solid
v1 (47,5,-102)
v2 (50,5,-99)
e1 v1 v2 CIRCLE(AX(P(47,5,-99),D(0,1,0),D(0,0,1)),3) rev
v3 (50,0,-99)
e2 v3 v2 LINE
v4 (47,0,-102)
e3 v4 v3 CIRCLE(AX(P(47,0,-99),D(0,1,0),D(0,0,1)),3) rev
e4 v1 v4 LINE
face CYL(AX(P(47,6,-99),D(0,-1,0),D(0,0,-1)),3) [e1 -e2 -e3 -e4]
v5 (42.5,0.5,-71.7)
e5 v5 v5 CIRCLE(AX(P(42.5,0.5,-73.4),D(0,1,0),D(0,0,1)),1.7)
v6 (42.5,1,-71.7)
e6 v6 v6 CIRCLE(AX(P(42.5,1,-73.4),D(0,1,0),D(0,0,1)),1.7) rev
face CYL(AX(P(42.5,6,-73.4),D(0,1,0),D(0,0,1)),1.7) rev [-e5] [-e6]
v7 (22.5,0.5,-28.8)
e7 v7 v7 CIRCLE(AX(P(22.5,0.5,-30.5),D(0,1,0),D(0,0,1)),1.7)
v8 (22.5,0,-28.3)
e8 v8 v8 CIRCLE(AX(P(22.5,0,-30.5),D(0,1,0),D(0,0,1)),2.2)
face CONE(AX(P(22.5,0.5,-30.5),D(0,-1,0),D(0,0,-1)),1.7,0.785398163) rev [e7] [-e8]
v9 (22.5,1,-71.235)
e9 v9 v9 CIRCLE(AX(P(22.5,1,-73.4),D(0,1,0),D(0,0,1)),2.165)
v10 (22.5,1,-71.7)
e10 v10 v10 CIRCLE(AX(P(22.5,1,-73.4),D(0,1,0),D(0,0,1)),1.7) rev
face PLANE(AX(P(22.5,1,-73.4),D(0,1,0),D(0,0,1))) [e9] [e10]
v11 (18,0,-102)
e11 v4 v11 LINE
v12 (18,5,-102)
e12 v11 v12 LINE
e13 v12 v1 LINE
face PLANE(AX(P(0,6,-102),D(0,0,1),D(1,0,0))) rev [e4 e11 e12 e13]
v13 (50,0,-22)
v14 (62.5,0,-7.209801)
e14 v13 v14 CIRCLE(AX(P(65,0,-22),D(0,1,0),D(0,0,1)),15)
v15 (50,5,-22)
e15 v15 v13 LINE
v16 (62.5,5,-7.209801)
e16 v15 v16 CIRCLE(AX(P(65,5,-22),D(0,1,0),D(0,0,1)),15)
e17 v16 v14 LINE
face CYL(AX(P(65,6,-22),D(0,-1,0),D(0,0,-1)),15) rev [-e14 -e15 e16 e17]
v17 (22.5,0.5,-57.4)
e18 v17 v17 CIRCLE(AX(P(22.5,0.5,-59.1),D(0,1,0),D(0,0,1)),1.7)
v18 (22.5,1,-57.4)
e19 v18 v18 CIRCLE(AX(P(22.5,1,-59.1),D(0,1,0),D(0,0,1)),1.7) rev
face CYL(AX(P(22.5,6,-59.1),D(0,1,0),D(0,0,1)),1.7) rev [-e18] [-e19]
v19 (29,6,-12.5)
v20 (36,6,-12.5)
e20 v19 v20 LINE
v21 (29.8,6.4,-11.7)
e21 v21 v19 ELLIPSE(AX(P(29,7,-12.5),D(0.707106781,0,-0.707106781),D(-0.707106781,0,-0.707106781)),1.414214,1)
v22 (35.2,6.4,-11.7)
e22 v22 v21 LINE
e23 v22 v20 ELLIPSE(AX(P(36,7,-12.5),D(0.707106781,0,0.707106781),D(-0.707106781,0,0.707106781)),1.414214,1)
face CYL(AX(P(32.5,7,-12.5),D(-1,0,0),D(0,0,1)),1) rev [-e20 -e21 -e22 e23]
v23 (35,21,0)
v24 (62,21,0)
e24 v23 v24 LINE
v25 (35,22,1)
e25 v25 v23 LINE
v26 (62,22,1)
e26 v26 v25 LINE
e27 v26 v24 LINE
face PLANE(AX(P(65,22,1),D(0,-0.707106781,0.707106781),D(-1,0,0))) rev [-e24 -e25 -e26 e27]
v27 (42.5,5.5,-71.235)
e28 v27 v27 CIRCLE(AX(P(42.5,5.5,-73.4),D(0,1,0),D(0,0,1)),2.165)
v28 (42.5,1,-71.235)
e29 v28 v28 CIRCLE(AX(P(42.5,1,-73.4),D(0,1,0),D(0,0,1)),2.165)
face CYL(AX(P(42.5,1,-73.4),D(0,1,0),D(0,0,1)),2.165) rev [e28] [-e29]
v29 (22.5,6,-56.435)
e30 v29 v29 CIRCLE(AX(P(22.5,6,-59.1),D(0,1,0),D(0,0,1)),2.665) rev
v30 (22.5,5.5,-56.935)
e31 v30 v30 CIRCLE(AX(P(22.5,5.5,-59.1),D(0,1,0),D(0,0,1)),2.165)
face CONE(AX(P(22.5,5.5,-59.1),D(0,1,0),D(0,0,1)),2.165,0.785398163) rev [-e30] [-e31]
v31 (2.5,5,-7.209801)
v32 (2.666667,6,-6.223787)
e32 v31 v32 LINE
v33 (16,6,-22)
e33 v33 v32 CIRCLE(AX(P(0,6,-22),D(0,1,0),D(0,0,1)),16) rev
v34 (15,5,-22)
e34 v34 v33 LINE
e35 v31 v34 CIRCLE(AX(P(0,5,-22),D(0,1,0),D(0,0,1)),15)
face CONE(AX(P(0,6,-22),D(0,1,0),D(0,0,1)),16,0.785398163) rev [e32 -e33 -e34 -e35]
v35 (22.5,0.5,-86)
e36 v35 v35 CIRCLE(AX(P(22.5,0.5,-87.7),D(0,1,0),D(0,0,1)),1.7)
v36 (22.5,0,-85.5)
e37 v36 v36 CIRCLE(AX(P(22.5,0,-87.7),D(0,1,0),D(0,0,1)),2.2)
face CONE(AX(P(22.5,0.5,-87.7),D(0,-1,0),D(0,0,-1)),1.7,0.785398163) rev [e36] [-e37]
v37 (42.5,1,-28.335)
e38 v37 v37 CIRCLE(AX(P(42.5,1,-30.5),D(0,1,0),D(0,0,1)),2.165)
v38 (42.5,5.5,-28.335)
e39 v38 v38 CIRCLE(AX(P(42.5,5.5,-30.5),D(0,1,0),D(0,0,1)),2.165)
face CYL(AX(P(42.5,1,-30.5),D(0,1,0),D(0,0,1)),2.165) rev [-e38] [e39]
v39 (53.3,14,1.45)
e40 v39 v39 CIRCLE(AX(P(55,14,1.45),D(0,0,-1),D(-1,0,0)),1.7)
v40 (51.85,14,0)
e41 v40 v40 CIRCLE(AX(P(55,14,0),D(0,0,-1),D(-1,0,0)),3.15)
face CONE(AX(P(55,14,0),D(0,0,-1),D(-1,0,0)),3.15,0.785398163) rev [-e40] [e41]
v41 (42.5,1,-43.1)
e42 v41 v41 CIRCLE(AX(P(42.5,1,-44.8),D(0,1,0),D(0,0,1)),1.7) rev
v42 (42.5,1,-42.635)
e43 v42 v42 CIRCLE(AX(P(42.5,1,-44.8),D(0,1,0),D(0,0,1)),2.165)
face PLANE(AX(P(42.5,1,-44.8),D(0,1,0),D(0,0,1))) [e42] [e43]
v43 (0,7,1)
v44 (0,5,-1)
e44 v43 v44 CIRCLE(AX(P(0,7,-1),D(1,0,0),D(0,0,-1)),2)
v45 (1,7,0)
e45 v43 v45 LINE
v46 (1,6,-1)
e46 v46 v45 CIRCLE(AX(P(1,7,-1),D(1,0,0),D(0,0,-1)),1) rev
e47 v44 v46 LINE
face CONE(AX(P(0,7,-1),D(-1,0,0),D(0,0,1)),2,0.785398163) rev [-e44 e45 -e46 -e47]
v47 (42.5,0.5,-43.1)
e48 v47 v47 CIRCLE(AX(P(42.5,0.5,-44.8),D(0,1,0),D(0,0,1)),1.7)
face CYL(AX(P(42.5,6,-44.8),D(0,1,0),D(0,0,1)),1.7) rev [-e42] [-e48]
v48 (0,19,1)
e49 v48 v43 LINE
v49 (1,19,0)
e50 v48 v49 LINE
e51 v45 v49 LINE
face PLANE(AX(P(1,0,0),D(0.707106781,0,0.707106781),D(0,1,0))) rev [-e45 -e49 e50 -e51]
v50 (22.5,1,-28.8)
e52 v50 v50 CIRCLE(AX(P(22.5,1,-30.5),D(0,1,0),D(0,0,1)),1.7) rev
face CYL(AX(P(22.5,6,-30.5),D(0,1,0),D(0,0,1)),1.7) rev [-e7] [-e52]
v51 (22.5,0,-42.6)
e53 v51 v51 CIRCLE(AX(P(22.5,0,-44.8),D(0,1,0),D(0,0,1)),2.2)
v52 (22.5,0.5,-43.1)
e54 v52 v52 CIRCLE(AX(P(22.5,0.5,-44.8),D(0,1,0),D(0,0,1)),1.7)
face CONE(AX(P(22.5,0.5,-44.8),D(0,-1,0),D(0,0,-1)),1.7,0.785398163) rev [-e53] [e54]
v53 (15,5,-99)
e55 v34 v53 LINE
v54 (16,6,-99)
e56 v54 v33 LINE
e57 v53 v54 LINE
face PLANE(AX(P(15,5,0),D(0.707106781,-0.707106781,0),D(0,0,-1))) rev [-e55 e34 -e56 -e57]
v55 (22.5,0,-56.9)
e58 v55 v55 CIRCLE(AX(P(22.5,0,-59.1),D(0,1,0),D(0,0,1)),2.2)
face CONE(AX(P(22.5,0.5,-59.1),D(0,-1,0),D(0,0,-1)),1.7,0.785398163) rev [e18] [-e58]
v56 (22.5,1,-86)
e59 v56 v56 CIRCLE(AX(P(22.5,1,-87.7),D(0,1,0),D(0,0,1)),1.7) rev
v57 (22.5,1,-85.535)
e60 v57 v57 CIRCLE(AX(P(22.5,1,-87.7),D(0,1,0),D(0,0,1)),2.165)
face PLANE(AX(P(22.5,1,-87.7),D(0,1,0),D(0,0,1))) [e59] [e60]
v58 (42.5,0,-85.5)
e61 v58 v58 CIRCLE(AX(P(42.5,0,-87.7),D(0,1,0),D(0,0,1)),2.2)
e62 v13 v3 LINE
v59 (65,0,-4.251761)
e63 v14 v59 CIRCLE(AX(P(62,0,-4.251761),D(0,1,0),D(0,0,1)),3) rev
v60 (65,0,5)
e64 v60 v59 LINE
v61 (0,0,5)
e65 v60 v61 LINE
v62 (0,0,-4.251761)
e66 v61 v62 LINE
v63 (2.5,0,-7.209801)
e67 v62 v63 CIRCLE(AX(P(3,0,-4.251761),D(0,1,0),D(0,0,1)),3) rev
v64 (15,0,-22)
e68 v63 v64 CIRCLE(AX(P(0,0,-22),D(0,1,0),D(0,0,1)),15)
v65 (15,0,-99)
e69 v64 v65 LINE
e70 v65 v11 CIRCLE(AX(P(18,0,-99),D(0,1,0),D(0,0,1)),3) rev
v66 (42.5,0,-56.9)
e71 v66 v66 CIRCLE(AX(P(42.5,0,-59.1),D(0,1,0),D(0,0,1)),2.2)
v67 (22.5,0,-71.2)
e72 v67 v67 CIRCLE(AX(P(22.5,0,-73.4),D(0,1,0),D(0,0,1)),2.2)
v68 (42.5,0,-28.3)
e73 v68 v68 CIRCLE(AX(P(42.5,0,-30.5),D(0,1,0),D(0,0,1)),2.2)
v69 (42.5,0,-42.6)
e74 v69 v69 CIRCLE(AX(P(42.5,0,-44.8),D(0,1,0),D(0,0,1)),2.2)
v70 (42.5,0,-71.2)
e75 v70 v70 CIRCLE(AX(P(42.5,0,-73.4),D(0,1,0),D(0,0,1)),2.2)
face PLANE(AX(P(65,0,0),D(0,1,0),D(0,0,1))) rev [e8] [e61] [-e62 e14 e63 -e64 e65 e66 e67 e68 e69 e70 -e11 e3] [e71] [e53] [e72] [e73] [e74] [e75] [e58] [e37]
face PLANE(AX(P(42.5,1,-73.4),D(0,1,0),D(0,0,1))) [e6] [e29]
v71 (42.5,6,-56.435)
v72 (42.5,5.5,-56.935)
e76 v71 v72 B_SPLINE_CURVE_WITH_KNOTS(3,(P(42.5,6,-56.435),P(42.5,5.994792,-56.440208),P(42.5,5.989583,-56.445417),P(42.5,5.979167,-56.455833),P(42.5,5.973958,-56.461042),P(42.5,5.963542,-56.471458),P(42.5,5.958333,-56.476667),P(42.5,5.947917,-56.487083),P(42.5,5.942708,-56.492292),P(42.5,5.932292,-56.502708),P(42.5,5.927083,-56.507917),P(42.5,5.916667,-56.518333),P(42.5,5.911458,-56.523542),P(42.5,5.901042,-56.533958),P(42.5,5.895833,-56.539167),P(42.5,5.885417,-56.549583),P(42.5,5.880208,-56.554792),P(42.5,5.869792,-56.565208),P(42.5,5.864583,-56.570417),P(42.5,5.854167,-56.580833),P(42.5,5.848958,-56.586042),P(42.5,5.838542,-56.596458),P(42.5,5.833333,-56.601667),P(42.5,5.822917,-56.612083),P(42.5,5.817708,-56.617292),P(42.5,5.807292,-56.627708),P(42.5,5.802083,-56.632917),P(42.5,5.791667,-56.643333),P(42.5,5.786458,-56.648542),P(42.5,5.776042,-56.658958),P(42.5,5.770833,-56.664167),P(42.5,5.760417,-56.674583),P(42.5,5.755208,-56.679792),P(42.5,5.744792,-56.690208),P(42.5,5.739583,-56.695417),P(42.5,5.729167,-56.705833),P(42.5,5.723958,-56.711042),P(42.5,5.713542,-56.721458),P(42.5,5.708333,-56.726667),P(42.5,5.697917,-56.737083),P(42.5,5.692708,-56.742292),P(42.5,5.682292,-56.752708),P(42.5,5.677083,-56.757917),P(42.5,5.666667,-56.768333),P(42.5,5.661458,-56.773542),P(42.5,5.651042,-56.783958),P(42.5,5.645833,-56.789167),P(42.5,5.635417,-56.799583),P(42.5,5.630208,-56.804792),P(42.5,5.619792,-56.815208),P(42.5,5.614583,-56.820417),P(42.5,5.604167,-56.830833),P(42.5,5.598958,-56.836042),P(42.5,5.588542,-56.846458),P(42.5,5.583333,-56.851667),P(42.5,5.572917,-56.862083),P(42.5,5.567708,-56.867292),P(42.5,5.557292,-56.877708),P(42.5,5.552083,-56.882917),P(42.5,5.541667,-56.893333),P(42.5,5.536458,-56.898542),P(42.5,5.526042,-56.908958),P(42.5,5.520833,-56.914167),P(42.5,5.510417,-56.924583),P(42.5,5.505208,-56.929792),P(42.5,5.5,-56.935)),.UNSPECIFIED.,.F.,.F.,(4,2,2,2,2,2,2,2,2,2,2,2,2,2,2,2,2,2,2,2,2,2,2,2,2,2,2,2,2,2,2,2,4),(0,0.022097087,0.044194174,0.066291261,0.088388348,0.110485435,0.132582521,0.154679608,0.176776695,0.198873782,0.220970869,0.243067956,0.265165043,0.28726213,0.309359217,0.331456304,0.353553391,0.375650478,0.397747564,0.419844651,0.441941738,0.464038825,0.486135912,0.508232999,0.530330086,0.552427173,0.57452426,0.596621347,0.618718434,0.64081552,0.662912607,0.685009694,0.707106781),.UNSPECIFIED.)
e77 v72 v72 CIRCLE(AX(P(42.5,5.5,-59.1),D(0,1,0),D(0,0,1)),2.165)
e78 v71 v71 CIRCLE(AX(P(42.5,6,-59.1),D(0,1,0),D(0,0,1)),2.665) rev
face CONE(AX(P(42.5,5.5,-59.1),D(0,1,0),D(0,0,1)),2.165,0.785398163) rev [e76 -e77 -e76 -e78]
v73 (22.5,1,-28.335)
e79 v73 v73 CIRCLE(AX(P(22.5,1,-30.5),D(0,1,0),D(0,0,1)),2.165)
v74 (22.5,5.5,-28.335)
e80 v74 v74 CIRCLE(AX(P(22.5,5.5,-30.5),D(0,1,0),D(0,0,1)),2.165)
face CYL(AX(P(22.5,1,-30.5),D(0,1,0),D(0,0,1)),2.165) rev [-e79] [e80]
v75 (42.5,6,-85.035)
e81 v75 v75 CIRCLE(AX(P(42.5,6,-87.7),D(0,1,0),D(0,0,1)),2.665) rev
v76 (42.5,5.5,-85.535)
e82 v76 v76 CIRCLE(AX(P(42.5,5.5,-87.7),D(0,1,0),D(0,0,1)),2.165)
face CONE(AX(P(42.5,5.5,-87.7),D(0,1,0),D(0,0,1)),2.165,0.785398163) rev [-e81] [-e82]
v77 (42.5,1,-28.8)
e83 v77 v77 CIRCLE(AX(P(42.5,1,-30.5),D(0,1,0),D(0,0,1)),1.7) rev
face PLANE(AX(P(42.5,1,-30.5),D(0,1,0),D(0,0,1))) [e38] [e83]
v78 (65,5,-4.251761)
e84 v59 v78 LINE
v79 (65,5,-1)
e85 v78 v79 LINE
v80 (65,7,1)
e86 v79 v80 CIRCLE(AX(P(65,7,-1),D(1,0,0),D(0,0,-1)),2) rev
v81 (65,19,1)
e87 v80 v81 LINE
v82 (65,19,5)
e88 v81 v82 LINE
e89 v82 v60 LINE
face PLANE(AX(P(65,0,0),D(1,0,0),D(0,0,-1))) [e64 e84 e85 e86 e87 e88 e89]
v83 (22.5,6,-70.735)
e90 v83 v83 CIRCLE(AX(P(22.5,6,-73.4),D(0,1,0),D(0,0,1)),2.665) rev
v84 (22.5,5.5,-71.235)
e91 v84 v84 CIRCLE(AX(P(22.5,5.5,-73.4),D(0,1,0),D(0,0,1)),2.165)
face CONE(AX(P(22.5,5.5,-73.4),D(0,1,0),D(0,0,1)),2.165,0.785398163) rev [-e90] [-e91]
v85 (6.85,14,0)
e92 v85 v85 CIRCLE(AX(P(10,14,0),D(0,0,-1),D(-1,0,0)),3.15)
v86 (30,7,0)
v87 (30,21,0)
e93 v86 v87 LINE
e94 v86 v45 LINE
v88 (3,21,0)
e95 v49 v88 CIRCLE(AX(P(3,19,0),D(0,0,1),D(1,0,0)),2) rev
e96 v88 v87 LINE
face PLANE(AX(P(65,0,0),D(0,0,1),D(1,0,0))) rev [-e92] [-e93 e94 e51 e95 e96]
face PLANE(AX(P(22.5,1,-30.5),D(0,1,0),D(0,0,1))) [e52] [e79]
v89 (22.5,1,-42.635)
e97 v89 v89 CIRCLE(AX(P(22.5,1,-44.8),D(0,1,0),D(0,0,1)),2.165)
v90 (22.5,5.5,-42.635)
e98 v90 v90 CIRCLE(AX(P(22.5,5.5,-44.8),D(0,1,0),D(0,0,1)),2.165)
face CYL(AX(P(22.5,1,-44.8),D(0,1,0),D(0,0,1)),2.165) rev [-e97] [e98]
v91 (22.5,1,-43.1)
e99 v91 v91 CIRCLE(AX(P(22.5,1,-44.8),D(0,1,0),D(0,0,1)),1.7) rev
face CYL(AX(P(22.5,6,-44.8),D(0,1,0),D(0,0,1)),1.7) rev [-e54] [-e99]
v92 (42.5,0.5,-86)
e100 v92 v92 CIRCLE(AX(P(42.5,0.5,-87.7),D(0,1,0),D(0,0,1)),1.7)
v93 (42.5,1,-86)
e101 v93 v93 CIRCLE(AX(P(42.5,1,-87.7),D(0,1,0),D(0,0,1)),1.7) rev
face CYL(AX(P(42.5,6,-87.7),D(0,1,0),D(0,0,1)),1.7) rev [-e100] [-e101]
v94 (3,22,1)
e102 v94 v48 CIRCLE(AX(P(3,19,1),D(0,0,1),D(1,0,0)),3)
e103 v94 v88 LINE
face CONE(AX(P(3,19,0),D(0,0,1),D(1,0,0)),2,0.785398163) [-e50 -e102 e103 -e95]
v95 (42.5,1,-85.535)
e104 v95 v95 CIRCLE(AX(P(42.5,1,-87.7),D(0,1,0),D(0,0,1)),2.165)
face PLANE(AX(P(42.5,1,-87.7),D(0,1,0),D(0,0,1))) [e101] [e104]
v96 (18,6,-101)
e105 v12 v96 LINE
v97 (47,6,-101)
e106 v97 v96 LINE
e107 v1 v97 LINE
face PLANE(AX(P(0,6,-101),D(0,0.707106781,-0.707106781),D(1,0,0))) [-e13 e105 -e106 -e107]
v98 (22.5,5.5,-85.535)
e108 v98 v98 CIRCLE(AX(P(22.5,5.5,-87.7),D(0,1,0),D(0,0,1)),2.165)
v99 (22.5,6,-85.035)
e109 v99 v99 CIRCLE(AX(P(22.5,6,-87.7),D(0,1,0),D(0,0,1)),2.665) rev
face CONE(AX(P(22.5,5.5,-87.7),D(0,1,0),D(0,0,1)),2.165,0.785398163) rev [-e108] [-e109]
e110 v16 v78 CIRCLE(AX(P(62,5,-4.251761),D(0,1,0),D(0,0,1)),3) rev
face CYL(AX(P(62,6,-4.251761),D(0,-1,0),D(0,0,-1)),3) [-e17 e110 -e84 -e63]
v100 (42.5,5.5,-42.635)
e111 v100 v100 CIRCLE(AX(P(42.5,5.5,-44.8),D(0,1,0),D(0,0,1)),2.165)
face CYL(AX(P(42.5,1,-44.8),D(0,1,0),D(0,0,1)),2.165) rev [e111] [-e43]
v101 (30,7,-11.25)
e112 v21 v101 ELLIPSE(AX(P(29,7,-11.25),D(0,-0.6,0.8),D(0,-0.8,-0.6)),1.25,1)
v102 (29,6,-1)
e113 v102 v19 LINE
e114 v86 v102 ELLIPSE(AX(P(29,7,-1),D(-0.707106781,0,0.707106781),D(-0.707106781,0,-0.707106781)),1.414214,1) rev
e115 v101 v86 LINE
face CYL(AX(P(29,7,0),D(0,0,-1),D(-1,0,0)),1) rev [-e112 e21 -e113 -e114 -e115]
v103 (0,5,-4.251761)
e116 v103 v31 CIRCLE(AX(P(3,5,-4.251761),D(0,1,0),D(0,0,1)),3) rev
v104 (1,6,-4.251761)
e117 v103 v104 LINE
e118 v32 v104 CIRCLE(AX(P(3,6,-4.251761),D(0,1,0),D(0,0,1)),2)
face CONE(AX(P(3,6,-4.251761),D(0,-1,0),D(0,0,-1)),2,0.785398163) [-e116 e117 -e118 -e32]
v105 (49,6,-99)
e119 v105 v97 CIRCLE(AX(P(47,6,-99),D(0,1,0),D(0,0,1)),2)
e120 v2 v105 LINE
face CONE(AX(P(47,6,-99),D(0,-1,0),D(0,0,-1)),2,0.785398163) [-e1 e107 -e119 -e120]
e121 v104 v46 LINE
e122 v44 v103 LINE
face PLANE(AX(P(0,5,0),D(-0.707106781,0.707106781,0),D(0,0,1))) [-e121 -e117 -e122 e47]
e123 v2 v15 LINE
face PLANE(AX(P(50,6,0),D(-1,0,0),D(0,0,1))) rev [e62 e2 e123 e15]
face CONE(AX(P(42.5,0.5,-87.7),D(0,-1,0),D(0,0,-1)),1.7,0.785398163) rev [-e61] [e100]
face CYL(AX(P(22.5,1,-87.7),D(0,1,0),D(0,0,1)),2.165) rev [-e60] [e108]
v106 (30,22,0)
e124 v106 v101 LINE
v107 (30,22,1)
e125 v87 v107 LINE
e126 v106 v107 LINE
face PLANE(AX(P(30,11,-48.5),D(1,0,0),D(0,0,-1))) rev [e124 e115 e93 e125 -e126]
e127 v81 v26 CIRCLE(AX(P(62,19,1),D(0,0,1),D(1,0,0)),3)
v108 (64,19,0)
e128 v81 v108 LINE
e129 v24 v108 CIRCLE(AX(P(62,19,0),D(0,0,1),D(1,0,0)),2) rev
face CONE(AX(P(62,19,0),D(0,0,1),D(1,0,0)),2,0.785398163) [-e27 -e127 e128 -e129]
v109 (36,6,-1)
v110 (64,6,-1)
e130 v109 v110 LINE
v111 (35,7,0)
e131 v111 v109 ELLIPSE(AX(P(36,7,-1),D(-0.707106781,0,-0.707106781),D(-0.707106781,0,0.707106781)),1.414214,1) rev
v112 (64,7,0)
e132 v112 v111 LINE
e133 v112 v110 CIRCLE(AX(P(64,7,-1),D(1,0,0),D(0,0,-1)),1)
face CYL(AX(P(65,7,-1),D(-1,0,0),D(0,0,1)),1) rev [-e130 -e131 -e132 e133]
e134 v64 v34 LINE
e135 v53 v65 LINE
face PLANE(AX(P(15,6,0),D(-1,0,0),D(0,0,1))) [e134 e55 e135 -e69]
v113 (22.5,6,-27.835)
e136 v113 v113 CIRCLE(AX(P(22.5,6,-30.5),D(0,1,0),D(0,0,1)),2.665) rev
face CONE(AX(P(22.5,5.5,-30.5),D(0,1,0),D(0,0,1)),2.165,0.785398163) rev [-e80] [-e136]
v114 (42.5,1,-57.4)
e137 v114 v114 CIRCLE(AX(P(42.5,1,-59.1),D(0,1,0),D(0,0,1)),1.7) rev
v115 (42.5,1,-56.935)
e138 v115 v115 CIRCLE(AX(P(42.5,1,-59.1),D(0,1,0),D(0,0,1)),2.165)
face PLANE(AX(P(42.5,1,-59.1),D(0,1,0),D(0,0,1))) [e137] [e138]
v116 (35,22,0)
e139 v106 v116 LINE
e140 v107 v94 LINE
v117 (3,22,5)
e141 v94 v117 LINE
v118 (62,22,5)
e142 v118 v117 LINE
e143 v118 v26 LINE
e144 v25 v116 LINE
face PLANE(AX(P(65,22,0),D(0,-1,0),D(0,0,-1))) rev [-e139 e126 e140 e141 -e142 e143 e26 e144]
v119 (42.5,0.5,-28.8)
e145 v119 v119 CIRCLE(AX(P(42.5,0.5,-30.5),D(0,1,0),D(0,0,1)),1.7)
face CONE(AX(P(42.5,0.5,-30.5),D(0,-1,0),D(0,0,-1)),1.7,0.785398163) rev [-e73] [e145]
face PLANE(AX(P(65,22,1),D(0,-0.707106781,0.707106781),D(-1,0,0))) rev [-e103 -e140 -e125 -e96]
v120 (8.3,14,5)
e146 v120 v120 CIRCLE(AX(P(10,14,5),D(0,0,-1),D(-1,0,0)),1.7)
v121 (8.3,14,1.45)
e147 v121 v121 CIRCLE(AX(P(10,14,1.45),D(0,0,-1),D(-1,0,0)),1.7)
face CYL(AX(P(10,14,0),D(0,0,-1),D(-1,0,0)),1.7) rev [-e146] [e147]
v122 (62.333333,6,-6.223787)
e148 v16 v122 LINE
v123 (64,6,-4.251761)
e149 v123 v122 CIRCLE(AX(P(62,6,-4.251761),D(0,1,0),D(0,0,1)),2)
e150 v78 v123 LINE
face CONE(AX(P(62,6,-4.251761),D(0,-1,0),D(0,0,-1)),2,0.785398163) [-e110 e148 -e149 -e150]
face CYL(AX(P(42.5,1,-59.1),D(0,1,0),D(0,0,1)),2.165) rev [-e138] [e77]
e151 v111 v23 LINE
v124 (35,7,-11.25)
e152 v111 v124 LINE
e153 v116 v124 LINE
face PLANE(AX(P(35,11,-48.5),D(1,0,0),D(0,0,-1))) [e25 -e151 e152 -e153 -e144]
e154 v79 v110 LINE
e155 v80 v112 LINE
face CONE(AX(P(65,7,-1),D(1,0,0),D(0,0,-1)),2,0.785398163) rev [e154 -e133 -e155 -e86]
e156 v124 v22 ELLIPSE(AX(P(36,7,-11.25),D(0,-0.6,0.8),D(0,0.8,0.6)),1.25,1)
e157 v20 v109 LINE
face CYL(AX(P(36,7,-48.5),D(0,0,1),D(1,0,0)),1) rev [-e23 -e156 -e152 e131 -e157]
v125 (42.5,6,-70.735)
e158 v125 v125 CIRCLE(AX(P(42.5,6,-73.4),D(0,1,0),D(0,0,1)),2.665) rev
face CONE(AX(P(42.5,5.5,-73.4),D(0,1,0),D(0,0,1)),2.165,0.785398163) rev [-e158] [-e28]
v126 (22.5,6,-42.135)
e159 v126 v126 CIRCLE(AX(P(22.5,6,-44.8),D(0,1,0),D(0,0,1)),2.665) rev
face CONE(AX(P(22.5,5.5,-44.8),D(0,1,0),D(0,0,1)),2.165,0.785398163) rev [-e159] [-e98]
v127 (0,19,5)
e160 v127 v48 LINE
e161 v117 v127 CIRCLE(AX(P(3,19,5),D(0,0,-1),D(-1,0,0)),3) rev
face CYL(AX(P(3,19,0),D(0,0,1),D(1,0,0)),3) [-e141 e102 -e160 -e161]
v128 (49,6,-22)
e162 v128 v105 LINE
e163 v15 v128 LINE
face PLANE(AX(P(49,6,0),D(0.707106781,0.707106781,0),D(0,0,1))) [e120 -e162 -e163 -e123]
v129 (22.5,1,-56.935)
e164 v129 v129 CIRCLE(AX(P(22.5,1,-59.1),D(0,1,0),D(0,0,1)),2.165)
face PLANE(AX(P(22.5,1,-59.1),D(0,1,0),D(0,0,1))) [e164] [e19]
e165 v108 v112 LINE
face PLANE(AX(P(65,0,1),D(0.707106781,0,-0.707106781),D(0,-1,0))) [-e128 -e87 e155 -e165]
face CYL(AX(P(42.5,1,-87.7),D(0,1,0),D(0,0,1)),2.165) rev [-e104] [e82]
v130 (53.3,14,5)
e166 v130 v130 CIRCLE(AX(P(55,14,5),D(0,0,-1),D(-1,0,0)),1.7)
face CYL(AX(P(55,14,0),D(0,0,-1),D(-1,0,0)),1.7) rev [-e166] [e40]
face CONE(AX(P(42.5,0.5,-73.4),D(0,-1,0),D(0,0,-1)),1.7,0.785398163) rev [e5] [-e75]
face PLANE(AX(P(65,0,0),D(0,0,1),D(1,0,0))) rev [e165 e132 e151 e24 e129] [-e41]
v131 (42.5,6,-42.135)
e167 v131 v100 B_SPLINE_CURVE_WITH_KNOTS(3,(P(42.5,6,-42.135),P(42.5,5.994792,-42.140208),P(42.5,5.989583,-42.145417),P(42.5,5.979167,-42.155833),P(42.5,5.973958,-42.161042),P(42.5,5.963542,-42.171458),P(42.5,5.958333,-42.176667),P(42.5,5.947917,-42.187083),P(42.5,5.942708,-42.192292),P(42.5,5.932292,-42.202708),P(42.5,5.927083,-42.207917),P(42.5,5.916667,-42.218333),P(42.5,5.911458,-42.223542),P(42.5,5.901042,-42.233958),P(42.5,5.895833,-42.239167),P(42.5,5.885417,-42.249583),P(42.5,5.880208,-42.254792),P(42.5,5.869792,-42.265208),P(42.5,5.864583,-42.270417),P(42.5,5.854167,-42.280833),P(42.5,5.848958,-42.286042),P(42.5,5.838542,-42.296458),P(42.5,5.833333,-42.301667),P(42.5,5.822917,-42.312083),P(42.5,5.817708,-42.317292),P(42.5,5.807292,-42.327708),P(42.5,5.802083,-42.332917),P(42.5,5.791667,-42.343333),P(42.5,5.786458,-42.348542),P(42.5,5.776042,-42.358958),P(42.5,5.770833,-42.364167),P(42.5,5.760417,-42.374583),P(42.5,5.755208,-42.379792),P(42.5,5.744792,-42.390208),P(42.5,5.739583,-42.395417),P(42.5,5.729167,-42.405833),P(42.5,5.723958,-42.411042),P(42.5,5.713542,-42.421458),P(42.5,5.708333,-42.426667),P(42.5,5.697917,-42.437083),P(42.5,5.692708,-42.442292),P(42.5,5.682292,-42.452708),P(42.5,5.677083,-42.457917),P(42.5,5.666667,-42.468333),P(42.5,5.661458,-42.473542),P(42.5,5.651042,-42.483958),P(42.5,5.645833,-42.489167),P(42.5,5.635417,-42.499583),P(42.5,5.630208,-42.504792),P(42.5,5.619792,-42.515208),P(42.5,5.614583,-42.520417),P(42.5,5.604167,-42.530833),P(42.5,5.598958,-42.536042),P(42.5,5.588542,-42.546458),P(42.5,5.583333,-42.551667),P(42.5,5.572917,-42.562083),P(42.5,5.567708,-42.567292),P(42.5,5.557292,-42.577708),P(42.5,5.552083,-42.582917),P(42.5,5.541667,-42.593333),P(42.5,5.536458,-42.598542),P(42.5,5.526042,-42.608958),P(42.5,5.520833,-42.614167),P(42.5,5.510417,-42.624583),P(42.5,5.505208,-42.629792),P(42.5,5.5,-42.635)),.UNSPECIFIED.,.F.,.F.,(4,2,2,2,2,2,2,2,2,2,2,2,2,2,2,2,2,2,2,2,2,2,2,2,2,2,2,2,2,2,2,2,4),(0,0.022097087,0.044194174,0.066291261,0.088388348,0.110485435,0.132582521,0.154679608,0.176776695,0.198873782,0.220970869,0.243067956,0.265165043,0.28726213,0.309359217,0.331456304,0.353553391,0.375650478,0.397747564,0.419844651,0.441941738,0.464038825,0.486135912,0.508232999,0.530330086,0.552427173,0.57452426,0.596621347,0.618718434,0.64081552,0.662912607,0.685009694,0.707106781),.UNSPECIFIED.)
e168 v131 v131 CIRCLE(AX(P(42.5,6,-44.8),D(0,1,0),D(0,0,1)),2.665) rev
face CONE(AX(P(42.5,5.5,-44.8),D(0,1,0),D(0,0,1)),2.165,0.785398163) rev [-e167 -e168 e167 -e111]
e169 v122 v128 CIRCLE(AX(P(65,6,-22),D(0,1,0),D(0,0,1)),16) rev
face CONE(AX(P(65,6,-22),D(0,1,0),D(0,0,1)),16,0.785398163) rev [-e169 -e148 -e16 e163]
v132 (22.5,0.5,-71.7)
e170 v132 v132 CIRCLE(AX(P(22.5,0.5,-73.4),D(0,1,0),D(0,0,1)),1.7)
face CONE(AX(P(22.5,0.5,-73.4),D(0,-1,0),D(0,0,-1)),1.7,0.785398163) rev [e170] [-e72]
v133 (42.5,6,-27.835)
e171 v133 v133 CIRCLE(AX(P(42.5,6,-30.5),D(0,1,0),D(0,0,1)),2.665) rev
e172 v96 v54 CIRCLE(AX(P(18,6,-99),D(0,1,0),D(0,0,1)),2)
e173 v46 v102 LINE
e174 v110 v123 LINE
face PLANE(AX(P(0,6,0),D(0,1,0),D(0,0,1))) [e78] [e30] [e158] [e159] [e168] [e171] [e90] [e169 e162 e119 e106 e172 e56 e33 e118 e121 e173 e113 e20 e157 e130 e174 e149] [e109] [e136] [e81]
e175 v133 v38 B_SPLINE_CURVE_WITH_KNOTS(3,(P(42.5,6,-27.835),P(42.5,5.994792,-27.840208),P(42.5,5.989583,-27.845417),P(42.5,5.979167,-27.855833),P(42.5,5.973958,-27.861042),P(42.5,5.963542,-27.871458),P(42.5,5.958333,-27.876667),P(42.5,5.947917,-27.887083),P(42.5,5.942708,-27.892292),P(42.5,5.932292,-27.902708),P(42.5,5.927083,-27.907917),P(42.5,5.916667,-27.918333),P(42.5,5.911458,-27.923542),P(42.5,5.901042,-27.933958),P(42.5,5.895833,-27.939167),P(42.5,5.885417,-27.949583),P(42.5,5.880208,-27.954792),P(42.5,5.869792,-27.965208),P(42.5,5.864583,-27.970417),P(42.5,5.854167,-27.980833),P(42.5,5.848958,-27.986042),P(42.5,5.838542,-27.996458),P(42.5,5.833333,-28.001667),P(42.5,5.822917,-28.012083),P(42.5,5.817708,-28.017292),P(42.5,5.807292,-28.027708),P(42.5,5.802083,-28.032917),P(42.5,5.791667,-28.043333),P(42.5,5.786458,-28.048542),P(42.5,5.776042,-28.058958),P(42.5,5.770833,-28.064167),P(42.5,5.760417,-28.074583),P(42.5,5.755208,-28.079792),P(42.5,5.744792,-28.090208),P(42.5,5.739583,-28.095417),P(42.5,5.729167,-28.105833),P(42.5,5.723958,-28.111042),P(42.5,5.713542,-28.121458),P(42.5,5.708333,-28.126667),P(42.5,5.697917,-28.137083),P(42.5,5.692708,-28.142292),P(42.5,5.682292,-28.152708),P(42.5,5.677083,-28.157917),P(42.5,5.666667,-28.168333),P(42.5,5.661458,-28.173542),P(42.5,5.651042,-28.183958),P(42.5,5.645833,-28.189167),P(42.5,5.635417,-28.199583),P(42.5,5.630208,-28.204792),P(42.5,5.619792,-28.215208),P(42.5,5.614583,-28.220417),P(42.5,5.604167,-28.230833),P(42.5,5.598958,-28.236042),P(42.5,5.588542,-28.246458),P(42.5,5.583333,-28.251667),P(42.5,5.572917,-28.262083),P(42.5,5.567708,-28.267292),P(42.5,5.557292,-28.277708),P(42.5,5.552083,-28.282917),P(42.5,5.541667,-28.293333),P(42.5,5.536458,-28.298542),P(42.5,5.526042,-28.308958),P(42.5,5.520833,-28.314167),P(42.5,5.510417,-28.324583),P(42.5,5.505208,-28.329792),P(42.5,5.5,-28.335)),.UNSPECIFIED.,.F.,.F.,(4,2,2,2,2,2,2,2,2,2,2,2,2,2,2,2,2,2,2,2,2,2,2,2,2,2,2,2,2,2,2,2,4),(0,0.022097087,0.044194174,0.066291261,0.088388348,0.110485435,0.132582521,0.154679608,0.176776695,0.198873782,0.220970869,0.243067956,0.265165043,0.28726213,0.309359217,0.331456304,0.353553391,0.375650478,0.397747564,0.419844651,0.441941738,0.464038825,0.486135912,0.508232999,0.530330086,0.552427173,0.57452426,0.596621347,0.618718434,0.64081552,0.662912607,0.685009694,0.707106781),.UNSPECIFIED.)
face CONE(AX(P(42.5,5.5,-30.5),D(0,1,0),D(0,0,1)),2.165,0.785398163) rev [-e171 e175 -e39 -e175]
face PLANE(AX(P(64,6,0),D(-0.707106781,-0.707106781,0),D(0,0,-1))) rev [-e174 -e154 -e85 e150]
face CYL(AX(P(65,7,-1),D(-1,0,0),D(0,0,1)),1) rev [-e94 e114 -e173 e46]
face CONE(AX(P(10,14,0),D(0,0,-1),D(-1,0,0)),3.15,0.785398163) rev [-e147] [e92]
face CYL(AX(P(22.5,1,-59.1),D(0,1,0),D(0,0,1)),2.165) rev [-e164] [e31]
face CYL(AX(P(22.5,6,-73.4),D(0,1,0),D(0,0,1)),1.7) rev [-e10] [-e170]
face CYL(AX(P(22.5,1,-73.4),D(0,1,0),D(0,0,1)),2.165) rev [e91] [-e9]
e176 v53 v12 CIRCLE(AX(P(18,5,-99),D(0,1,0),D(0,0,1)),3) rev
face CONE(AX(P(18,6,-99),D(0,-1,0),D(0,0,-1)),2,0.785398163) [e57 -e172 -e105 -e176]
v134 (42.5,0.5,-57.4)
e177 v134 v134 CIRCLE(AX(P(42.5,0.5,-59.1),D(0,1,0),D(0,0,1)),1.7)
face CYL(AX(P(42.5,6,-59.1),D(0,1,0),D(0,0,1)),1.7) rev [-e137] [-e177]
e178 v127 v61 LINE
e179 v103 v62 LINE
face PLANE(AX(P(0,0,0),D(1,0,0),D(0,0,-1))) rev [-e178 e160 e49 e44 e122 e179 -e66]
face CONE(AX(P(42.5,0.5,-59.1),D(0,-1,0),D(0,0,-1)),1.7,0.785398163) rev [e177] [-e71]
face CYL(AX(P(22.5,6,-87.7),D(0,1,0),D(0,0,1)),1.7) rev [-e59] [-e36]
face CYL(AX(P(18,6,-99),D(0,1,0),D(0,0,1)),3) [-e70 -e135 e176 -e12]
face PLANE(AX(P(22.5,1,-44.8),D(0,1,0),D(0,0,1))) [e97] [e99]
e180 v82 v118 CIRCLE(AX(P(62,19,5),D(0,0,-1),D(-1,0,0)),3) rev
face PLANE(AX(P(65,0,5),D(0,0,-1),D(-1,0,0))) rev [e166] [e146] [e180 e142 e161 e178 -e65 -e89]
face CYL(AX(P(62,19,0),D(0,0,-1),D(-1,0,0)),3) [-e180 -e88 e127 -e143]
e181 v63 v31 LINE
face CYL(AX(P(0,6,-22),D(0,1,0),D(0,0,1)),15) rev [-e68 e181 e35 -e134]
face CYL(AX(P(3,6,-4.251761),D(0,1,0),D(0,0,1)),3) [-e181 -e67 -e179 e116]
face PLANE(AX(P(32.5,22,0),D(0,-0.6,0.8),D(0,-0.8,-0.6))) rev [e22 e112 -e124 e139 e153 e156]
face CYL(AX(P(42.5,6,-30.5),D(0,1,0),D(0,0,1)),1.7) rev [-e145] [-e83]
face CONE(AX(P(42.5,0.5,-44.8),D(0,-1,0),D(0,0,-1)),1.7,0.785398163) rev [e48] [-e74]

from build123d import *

# Parameters (mm, degrees)
SKETCH1_W                                       = 5
SKETCH1_H                                       = 22
BOSS_EXTRUDE1_DEPTH                             = 65
SKETCH2_W                                       = 17.5
SKETCH2_H                                       = 95
SKETCH2_H_2                                     = 7
SKETCH2_W_2                                     = 15
BOSS_EXTRUDE2_DEPTH                             = 6
CSK_FOR_M3_FLAT_HEAD_MACHINE_SCREW1_D           = 3.4
CSK_FOR_M3_FLAT_HEAD_MACHINE_SCREW1_CSINK_D     = 6.3
CSK_FOR_M3_FLAT_HEAD_MACHINE_SCREW1_CSINK_ANGLE = 90
M3_CLEARANCE_HOLE2_AT_2_COUNT                   = 2
M3_CLEARANCE_HOLE2_AT_2_PITCH                   = 20
M3_CLEARANCE_HOLE2_AT_3_COUNT                   = 2
M3_CLEARANCE_HOLE2_AT_3_PITCH                   = 24.586378342
M3_CLEARANCE_HOLE2_AT_4_COUNT                   = 2
M3_CLEARANCE_HOLE2_AT_4_PITCH                   = 14.3
M3_CLEARANCE_HOLE2_AT_5_COUNT                   = 2
M3_CLEARANCE_HOLE2_AT_5_PITCH                   = 28.6
M3_CLEARANCE_HOLE2_AT_6_COUNT                   = 2
M3_CLEARANCE_HOLE2_AT_6_PITCH                   = 34.89928366
M3_CLEARANCE_HOLE2_AT_7_COUNT                   = 2
M3_CLEARANCE_HOLE2_AT_7_PITCH                   = 47.332969482
M3_CLEARANCE_HOLE2_AT_8_COUNT                   = 2
M3_CLEARANCE_HOLE2_AT_8_PITCH                   = 42.9
M3_CLEARANCE_HOLE2_AT_9_COUNT                   = 2
M3_CLEARANCE_HOLE2_AT_9_PITCH                   = 57.2
M3_CLEARANCE_HOLE2_AT_10_COUNT                  = 2
M3_CLEARANCE_HOLE2_AT_10_PITCH                  = 60.595709419
SKETCH8_R                                       = 2.165
CUT_EXTRUDE1_DEPTH                              = 5
RIB5_REACH                                      = 111.29
SKETCH9_WALL_W                                  = 240.579504986
SKETCH9_WALL_H                                  = 5
FILLET1_R                                       = 15
FILLET2_R                                       = 3
FILLET6_R                                       = 1
CHAMFER1_SIZE                                   = 1
CHAMFER2_SIZE                                   = 0.5


with BuildPart() as part:
    # Sketch1 → Boss-Extrude1 (new body)
    with BuildSketch(Plane(origin=(0, 0, 0), x_dir=(0, 0, -1), z_dir=(1, 0, 0))):
        with Locations((-2.5, 11)):
            Rectangle(SKETCH1_W, SKETCH1_H)
    extrude(amount=BOSS_EXTRUDE1_DEPTH)

    # Sketch2 → Boss-Extrude2 (add)
    with BuildSketch(Plane(origin=(0, 0, 0), x_dir=(1, 0, 0), z_dir=(0, 1, 0))):
        with Locations((23.75, 54.5)):
            Rectangle(SKETCH2_W, SKETCH2_H)
        with Locations((41.25, 54.5)):
            Rectangle(SKETCH2_W, SKETCH2_H)
        with Locations((41.25, 3.5)):
            Rectangle(SKETCH2_W, SKETCH2_H_2)
        with Locations((23.75, 3.5)):
            Rectangle(SKETCH2_W, SKETCH2_H_2)
        with Locations((7.5, 3.5)):
            Rectangle(SKETCH2_W_2, SKETCH2_H_2)
        with Locations((57.5, 3.5)):
            Rectangle(SKETCH2_W_2, SKETCH2_H_2)
    extrude(amount=BOSS_EXTRUDE2_DEPTH)

    # CSK for M3 Flat Head Machine Screw1 (through all)
    with Locations(Plane(origin=(0, 0, 0), x_dir=(-1, 0, 0), z_dir=(0, 0, -1))):
        with Locations((-55, 14), (-10, 14)):
            CounterSinkHole(CSK_FOR_M3_FLAT_HEAD_MACHINE_SCREW1_D / 2, CSK_FOR_M3_FLAT_HEAD_MACHINE_SCREW1_CSINK_D / 2, counter_sink_angle=CSK_FOR_M3_FLAT_HEAD_MACHINE_SCREW1_CSINK_ANGLE)

    # Sketch7 → M3 Clearance Hole2 (revolve, cut)
    with BuildSketch(Plane(origin=(22.5, 6, -30.5), x_dir=(0, 0, 1), z_dir=(1, 0, 0))):
        Polygon((0, 0), (0, 6), (2.2, 6), (1.7, 5.5), (1.7, 0), align=None)
    m3_clearance_hole2 = revolve(axis=Axis((22.5, 12.35, -30.5), (0, -1, 0)), mode=Mode.SUBTRACT)

    # M3 Clearance Hole2 at 2: M3 Clearance Hole2 ×2
    with Locations(*[(i * M3_CLEARANCE_HOLE2_AT_2_PITCH, 0, 0) for i in range(1, M3_CLEARANCE_HOLE2_AT_2_COUNT)]):
        add(m3_clearance_hole2, mode=Mode.SUBTRACT)

    # M3 Clearance Hole2 at 3: M3 Clearance Hole2 ×2
    with Locations(*[Vector(0.8134585631685806, 0, -0.5816228726655346) * (i * M3_CLEARANCE_HOLE2_AT_3_PITCH) for i in range(1, M3_CLEARANCE_HOLE2_AT_3_COUNT)]):
        add(m3_clearance_hole2, mode=Mode.SUBTRACT)

    # M3 Clearance Hole2 at 4: M3 Clearance Hole2 ×2
    with Locations(*[(0, 0, -i * M3_CLEARANCE_HOLE2_AT_4_PITCH) for i in range(1, M3_CLEARANCE_HOLE2_AT_4_COUNT)]):
        add(m3_clearance_hole2, mode=Mode.SUBTRACT)

    # M3 Clearance Hole2 at 5: M3 Clearance Hole2 ×2
    with Locations(*[(0, 0, -i * M3_CLEARANCE_HOLE2_AT_5_PITCH) for i in range(1, M3_CLEARANCE_HOLE2_AT_5_COUNT)]):
        add(m3_clearance_hole2, mode=Mode.SUBTRACT)

    # M3 Clearance Hole2 at 6: M3 Clearance Hole2 ×2
    with Locations(*[Vector(0.5730776652808003, 0, -0.8195010613515441) * (i * M3_CLEARANCE_HOLE2_AT_6_PITCH) for i in range(1, M3_CLEARANCE_HOLE2_AT_6_COUNT)]):
        add(m3_clearance_hole2, mode=Mode.SUBTRACT)

    # M3 Clearance Hole2 at 7: M3 Clearance Hole2 ×2
    with Locations(*[Vector(0.4225384593192284, 0, -0.9063449952397448) * (i * M3_CLEARANCE_HOLE2_AT_7_PITCH) for i in range(1, M3_CLEARANCE_HOLE2_AT_7_COUNT)]):
        add(m3_clearance_hole2, mode=Mode.SUBTRACT)

    # M3 Clearance Hole2 at 8: M3 Clearance Hole2 ×2
    with Locations(*[(0, 0, -i * M3_CLEARANCE_HOLE2_AT_8_PITCH) for i in range(1, M3_CLEARANCE_HOLE2_AT_8_COUNT)]):
        add(m3_clearance_hole2, mode=Mode.SUBTRACT)

    # M3 Clearance Hole2 at 9: M3 Clearance Hole2 ×2
    with Locations(*[(0, 0, -i * M3_CLEARANCE_HOLE2_AT_9_PITCH) for i in range(1, M3_CLEARANCE_HOLE2_AT_9_COUNT)]):
        add(m3_clearance_hole2, mode=Mode.SUBTRACT)

    # M3 Clearance Hole2 at 10: M3 Clearance Hole2 ×2
    with Locations(*[Vector(0.3300563718411858, 0, -0.943961223465791) * (i * M3_CLEARANCE_HOLE2_AT_10_PITCH) for i in range(1, M3_CLEARANCE_HOLE2_AT_10_COUNT)]):
        add(m3_clearance_hole2, mode=Mode.SUBTRACT)

    # Sketch8 → Cut-Extrude1 (cut)
    with BuildSketch(Plane(origin=(0, 6, 0), x_dir=(1, 0, 0), z_dir=(0, 1, 0))):
        with Locations(Location((22.5, 87.7, 0), (0, 0, 270))):
            Circle(SKETCH8_R)
        with Locations(Location((42.5, 87.7, 0), (0, 0, 270))):
            Circle(SKETCH8_R)
        with Locations(Location((22.5, 73.4, 0), (0, 0, 270))):
            Circle(SKETCH8_R)
        with Locations(Location((42.5, 73.4, 0), (0, 0, 270))):
            Circle(SKETCH8_R)
        with Locations(Location((22.5, 59.1, 0), (0, 0, 270))):
            Circle(SKETCH8_R)
        with Locations(Location((42.5, 59.1, 0), (0, 0, 270))):
            Circle(SKETCH8_R)
        with Locations(Location((22.5, 44.8, 0), (0, 0, 270))):
            Circle(SKETCH8_R)
        with Locations(Location((42.5, 44.8, 0), (0, 0, 270))):
            Circle(SKETCH8_R)
        with Locations(Location((22.5, 30.5, 0), (0, 0, 270))):
            Circle(SKETCH8_R)
        with Locations(Location((42.5, 30.5, 0), (0, 0, 270))):
            Circle(SKETCH8_R)
    extrude(amount=-CUT_EXTRUDE1_DEPTH, mode=Mode.SUBTRACT)

    # Sketch9 wall → Rib5 (add, up to next)
    with BuildSketch(Plane(origin=(32.5, 14, -6), x_dir=(0, -0.8, -0.6), z_dir=(0, 0.6, -0.8)), mode=Mode.PRIVATE) as rib5_sk1:
        Rectangle(SKETCH9_WALL_W, SKETCH9_WALL_H)
    rib5_tool1 = extrude(rib5_sk1.sketch, amount=-RIB5_REACH, mode=Mode.PRIVATE) - part.part
    add(rib5_tool1.solids().sort_by_distance((32.5, 14, -6))[0])

    # Fillet1
    fillet1_edges = [part.edges().sort_by_distance(p)[0] for p in [
        (50, 3, -7),
        (15, 3, -7),
    ]]
    fillet(fillet1_edges, radius=FILLET1_R - 0.0001)  # a hair under: the kernel refuses the full size

    # Fillet2
    fillet2_edges = [part.edges().sort_by_distance(p)[0] for p in [
        (65, 3, -7),
        (50, 3, -102),
        (15, 3, -102),
        (0, 3, -7),
        (0, 22, 2.5),
        (65, 22, 2.5),
    ]]
    fillet(fillet2_edges, radius=FILLET2_R)

    # Fillet6
    fillet6_edges = [part.edges().sort_by_distance(p)[0] for p in [
        (50, 6, 0),
        (15, 6, 0),
        (30, 6, -6),
        (32.5, 6, -12),
        (35, 6, -6),
    ]]
    fillet(fillet6_edges, radius=FILLET6_R)

    # Chamfer1
    chamfer1_edges = [part.edges().sort_by_distance(p)[0] for p in [
        (16.5, 22, 0),
        (50, 6, -60.49995),
        (15, 6, -60.49995),
        (11.45644013, 6, -12.317479289),
        (53.54355987, 6, -12.317479289),
        (32.5, 6, -102),
        (15.878679656, 6, -101.121320344),
        (49.121320344, 6, -101.121320344),
        (64.291283301, 6, -6.188242219),
        (0.708716699, 6, -6.188242219),
        (48.5, 22, 0),
        (64.121320344, 21.121320344, 0),
        (0.878679656, 21.121320344, 0),
        (0, 13, 0),
        (0, 6, -2.625872583),
        (65, 6, -2.625872583),
        (65, 13, 0),
        (0, 6.292893219, -0.292893219),
        (65, 6.292893219, -0.292893219),
    ]]
    chamfer(chamfer1_edges, length=CHAMFER1_SIZE)

    # Chamfer2
    chamfer2_edges = [part.edges().sort_by_distance(p)[0] for p in [
        (42.5, 6, -61.265),
        (22.5, 6, -46.965),
        (42.5, 6, -46.965),
        (22.5, 6, -32.665),
        (42.5, 6, -89.865),
        (22.5, 6, -75.565),
        (42.5, 6, -75.565),
        (22.5, 6, -61.265),
        (42.5, 6, -32.665),
        (22.5, 6, -89.865),
    ]]
    chamfer(chamfer2_edges, length=CHAMFER2_SIZE)


solid = part.part
